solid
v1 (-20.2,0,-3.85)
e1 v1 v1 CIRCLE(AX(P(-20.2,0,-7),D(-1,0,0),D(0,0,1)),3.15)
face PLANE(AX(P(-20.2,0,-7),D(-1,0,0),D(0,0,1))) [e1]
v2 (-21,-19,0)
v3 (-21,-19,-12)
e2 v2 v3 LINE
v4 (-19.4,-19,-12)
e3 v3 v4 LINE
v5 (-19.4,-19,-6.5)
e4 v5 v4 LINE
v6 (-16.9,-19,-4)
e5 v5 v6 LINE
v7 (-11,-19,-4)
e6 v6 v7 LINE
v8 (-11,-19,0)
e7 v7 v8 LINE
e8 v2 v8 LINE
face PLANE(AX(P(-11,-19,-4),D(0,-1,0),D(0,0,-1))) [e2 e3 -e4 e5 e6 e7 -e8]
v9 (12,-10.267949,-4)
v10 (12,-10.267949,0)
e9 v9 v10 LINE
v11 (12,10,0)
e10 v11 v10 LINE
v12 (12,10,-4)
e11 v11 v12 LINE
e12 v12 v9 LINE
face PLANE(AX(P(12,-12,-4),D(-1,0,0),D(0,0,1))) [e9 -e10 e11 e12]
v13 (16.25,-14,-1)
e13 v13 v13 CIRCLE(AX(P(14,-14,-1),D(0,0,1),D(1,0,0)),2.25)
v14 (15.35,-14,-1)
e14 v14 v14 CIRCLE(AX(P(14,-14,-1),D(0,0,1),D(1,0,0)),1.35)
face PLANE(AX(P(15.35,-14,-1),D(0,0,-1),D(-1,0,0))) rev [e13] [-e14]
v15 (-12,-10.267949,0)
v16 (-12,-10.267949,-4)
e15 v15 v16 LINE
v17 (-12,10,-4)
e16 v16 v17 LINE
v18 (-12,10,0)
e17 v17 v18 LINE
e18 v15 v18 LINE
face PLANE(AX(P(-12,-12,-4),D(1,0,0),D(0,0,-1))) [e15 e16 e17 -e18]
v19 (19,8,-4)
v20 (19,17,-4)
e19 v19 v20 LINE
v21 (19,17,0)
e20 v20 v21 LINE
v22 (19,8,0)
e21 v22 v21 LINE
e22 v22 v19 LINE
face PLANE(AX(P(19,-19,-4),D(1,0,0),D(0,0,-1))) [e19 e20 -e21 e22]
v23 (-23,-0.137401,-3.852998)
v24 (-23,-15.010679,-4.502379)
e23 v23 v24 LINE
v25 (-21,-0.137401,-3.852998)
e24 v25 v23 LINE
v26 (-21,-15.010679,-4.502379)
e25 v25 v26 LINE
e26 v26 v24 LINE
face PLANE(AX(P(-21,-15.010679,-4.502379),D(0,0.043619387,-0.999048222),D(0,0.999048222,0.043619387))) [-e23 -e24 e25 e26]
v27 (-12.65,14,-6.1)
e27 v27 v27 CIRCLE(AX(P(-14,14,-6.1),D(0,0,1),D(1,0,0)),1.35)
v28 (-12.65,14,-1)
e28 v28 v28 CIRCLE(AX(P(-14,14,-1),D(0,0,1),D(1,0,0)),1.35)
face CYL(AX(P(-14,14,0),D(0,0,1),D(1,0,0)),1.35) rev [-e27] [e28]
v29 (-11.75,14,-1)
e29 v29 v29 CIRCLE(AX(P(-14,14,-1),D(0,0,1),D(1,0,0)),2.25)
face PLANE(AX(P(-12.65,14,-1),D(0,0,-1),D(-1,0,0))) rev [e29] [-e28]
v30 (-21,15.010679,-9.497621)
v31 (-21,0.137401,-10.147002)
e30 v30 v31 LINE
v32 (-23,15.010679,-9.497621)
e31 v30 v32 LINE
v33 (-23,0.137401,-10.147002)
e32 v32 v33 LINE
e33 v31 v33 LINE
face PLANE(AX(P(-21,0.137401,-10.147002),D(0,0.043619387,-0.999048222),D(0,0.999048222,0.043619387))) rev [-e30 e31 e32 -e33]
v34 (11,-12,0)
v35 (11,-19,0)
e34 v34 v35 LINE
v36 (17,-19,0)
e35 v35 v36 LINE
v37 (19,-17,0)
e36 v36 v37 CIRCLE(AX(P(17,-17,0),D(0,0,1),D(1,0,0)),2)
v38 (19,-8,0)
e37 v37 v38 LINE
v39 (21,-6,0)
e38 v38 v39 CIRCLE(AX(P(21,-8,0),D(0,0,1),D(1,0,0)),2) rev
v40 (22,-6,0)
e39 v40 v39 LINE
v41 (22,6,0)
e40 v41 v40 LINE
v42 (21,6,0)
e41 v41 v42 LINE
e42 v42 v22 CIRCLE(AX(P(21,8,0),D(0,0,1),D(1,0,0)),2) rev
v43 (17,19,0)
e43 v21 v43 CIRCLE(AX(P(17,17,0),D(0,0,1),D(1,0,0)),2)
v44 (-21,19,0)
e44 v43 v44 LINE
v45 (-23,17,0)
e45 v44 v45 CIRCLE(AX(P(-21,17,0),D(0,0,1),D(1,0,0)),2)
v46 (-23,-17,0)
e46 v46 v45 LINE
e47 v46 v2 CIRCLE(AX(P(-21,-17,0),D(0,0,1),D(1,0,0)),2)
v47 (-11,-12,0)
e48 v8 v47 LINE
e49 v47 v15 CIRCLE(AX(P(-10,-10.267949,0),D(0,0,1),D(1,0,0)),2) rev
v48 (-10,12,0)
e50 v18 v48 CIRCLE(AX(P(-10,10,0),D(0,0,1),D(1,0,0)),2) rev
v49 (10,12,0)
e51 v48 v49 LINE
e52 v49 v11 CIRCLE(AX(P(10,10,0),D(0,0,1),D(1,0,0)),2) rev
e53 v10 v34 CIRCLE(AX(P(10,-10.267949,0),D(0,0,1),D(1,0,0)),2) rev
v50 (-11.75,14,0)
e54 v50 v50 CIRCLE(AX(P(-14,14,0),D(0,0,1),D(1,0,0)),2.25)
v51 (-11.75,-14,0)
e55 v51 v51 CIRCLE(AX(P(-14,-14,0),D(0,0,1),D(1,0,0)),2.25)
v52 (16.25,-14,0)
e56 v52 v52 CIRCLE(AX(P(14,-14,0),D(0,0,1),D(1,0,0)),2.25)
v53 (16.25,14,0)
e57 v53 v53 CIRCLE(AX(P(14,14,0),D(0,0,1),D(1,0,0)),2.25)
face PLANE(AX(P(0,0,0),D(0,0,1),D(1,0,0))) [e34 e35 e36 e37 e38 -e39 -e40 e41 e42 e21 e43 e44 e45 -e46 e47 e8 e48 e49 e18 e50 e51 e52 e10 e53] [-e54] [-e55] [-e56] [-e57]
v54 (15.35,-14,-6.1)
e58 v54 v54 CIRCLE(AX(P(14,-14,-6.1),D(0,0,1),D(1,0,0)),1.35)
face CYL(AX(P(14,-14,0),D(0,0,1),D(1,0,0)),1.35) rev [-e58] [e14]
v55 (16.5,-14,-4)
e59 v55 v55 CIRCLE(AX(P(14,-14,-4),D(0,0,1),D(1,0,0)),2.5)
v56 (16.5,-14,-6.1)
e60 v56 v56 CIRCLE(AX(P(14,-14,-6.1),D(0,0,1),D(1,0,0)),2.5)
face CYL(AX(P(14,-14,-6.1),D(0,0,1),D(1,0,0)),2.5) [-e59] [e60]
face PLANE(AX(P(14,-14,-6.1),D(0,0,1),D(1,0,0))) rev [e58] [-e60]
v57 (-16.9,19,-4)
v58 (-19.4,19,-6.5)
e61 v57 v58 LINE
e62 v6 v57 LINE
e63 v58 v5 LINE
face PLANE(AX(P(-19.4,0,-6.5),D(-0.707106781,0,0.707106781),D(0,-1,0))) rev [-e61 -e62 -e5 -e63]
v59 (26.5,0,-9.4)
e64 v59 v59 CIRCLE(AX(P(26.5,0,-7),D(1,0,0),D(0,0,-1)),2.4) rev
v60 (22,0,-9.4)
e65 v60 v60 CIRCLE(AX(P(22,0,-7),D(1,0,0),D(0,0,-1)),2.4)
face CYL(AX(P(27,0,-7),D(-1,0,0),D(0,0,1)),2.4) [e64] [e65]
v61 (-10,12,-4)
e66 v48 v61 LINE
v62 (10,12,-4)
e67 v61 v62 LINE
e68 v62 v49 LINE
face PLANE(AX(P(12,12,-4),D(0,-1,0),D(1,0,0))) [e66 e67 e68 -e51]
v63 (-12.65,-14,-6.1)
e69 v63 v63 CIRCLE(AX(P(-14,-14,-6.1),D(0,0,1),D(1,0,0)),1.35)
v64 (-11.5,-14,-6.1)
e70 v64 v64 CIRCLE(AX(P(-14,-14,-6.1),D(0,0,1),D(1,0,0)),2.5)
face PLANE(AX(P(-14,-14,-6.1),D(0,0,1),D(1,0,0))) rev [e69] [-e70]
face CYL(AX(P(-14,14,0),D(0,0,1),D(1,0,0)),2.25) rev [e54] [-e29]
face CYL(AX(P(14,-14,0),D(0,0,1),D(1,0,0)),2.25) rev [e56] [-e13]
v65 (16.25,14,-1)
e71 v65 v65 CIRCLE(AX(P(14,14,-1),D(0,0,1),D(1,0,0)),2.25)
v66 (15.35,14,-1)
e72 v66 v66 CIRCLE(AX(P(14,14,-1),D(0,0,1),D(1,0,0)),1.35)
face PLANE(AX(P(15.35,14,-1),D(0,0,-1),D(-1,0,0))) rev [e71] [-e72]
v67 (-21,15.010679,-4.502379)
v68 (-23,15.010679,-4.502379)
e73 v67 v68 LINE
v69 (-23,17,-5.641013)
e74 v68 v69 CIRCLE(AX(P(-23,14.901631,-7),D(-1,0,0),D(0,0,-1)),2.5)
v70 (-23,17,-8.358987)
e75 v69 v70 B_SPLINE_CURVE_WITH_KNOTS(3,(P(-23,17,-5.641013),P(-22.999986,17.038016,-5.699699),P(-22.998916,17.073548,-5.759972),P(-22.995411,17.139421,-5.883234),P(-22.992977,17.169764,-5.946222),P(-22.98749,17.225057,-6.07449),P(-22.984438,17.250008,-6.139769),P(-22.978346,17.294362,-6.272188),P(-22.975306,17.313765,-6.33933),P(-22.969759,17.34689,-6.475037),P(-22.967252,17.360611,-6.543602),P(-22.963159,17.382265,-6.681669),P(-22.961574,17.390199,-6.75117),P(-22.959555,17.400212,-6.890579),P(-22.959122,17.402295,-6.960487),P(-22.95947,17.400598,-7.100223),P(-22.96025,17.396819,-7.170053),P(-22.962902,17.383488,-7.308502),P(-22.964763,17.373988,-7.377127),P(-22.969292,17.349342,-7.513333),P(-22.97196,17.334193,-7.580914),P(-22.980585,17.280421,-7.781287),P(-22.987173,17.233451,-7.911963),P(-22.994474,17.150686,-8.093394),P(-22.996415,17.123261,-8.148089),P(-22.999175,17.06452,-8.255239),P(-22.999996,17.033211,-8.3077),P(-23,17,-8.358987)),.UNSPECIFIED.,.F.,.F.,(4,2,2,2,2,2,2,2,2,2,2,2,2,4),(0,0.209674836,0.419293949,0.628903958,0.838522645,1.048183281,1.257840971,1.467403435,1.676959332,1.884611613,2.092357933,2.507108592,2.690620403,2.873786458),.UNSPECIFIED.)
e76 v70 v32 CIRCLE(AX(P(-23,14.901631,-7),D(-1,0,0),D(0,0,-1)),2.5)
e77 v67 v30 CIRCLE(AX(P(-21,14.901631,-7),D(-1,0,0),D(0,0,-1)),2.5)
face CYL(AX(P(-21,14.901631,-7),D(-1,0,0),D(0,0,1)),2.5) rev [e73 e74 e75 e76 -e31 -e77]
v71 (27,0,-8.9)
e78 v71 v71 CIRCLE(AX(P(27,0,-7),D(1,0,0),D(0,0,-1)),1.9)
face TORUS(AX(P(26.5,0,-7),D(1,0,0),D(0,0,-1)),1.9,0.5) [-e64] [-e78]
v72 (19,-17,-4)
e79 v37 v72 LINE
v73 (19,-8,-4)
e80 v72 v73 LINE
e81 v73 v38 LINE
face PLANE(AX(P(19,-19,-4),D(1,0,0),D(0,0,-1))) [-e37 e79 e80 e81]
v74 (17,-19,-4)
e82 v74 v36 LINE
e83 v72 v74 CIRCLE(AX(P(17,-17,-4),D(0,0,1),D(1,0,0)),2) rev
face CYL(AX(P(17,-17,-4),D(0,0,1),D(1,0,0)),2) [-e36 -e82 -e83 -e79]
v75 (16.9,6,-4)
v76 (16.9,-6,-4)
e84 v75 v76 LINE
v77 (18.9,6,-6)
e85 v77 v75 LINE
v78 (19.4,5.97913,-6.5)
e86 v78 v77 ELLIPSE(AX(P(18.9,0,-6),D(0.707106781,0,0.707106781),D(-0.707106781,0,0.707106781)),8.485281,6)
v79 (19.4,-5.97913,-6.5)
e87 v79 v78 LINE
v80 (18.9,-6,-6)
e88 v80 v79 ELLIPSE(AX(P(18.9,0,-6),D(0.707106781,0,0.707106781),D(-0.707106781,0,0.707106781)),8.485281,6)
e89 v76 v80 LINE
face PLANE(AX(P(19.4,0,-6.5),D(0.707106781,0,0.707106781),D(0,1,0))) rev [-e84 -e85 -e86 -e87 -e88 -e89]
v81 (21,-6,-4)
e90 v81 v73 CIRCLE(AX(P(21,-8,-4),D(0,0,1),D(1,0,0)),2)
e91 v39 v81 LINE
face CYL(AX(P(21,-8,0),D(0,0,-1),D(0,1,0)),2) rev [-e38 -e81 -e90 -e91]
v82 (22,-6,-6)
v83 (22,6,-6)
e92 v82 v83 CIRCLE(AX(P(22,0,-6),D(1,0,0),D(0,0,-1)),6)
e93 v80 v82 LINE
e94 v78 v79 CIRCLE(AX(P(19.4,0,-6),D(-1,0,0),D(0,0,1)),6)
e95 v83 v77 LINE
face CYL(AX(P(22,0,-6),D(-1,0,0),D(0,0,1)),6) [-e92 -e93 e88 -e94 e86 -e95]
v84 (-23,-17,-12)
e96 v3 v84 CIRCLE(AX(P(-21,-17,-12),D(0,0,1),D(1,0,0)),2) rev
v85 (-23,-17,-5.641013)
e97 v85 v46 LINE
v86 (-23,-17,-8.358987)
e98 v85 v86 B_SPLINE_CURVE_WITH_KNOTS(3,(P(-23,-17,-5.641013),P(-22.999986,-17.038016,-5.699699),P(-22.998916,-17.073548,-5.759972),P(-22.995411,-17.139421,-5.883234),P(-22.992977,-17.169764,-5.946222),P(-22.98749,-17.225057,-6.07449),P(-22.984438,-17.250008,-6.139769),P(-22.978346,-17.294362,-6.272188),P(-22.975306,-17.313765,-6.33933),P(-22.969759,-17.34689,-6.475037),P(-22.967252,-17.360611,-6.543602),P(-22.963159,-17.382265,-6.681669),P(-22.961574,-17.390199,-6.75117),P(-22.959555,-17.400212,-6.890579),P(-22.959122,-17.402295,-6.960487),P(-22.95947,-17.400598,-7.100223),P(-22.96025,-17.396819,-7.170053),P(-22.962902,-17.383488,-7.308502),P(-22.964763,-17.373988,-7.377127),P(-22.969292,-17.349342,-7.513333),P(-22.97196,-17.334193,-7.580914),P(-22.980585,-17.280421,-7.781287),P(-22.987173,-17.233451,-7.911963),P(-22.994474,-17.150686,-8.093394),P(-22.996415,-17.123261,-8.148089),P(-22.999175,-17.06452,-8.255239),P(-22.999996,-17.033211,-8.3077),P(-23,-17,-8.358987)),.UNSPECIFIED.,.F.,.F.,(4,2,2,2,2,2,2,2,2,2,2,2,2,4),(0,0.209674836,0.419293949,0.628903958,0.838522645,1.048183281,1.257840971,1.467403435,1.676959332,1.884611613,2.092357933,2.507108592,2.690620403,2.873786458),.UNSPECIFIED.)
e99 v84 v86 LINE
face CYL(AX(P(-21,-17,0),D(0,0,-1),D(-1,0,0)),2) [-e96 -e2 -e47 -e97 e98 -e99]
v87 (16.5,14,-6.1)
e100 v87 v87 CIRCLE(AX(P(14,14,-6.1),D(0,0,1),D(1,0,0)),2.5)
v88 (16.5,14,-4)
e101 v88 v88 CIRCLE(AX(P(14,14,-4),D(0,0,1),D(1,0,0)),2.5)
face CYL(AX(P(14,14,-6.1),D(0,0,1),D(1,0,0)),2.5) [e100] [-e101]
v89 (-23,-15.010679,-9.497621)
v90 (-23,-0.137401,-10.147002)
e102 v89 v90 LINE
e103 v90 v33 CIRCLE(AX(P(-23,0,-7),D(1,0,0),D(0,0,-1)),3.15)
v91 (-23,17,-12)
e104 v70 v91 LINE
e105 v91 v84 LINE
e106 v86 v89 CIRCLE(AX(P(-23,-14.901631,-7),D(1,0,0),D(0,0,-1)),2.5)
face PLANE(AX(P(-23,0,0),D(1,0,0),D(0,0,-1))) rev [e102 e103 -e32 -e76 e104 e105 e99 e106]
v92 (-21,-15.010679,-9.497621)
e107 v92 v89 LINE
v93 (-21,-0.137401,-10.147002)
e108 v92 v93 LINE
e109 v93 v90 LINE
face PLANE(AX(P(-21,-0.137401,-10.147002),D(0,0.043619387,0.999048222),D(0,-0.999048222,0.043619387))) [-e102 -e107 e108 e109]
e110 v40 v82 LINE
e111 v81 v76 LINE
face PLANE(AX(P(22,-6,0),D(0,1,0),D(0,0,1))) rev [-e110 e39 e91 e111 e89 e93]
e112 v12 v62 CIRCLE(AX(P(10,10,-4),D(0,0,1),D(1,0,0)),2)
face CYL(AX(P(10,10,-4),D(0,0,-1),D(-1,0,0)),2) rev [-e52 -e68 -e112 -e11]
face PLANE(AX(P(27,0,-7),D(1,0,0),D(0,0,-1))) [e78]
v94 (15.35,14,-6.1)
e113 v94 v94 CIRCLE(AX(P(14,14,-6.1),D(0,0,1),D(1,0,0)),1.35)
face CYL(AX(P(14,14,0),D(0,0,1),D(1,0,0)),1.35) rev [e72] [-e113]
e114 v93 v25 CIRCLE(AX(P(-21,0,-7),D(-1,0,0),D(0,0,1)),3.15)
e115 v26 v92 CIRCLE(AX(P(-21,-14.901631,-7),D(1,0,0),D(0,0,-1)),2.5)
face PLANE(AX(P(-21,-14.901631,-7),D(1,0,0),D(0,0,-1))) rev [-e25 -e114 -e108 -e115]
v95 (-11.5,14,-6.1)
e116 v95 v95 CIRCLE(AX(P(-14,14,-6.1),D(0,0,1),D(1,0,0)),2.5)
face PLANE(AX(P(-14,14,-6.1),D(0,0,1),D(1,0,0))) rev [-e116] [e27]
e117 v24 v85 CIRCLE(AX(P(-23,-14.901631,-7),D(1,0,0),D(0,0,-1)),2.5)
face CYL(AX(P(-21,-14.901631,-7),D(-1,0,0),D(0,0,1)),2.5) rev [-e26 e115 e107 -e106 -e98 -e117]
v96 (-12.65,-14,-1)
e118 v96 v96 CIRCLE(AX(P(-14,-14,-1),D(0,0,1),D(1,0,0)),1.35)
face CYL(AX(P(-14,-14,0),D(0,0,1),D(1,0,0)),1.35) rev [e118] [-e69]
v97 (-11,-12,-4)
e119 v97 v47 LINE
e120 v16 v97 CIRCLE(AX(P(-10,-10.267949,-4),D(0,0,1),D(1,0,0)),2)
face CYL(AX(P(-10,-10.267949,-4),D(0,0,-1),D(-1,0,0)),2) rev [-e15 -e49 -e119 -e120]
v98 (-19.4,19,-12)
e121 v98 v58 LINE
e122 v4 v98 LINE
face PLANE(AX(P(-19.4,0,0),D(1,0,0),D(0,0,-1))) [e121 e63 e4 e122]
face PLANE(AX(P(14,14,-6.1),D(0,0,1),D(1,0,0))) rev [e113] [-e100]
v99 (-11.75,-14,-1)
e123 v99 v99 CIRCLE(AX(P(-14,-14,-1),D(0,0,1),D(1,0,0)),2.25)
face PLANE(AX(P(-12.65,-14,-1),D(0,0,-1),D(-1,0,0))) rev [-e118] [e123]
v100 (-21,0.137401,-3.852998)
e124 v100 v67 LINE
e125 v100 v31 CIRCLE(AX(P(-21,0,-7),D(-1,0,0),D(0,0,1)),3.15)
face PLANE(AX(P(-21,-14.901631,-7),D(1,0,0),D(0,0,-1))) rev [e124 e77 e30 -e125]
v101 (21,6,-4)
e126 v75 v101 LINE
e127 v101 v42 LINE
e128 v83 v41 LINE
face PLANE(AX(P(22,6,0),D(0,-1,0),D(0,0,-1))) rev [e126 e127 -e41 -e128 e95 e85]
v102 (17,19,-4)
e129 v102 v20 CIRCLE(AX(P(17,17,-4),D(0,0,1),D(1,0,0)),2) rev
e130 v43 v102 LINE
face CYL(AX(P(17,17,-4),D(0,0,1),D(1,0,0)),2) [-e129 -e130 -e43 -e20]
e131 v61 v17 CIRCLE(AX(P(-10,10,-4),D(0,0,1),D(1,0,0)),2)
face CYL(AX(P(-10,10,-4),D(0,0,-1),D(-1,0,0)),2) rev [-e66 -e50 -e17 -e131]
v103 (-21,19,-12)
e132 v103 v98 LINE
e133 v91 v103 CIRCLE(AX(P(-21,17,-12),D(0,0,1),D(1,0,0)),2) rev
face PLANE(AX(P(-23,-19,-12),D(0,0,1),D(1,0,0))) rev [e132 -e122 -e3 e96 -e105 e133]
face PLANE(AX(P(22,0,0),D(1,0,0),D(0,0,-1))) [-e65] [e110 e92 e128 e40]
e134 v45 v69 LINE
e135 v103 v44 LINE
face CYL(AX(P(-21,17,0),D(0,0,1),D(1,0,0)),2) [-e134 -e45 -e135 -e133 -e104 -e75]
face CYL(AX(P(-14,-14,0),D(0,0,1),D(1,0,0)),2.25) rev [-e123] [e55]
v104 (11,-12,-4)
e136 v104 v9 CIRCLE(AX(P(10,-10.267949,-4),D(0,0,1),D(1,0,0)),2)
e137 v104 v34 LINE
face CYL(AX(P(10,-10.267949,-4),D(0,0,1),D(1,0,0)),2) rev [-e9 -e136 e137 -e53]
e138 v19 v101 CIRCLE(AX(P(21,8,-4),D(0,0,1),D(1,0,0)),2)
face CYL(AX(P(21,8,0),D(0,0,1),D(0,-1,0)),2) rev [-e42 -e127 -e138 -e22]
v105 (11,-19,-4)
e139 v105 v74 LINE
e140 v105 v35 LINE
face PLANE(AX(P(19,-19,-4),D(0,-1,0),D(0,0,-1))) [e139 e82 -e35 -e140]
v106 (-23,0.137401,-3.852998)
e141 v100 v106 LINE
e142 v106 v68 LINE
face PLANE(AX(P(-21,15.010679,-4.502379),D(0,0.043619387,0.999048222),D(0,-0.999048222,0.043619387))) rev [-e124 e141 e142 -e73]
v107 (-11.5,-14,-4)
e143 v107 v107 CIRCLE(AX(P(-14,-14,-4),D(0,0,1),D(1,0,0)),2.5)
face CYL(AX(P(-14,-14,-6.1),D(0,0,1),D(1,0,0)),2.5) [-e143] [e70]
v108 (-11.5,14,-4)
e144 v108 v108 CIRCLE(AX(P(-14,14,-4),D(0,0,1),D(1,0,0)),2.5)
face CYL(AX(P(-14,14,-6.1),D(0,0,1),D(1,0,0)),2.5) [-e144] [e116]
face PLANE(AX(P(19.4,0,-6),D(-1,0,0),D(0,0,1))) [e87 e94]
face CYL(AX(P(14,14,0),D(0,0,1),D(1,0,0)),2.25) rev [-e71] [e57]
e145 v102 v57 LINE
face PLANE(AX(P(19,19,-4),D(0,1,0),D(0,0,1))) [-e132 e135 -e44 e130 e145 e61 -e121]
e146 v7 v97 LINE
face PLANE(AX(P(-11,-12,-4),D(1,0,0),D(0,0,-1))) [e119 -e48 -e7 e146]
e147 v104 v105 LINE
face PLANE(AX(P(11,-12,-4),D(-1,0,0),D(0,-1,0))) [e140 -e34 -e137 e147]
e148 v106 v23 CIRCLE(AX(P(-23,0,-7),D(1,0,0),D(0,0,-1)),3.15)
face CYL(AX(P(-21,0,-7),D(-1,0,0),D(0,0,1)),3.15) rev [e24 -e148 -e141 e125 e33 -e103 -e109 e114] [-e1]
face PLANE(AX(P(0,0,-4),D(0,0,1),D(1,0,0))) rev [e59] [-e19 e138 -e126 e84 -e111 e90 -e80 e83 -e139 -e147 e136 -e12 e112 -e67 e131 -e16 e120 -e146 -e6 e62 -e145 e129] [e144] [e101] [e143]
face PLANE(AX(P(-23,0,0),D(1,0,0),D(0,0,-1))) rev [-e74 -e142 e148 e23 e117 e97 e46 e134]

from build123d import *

# Parameters (mm, degrees)
EXTRUDE_1_DEPTH           = 4
EXTRUDE_START             = -4
SKETCH_6_R                = 2.5000000000000004
SKETCH_6_R_2              = 2.4999999999999987
EXTRUDE_5_DEPTH           = 2.1
HOLE_WIZARD_1_D           = 2.7
HOLE_WIZARD_1_CBORE_D     = 4.5
HOLE_WIZARD_1_CBORE_DEPTH = 1
EXTRUDE_3_DEPTH           = 4
FILLET_1_R                = 2
CUT_EXTRUDE_1_DEPTH       = 2
SKETCH_14_R               = 3.150000000000003
CUT_EXTRUDE_4_DEPTH       = 0.8
EXTRUDE_6_DEPTH           = 3
SKETCH_11_R               = 2.399999999999999
EXTRUDE_7_DEPTH           = 5
FILLET_2_RADIUS           = 6
FILLET_2_LENGTH           = 3
FILLET_4_R                = 2
FILLET_6_R                = 0.5
CUT_EXTRUDE_2_DEPTH       = 0.4
CUT_EXTRUDE_3_DEPTH       = 0.4
CHAMFER_1_SIZE            = 2.5


with BuildPart() as part:
    # 草图1 → 凸台-拉伸1 (new body)
    with BuildSketch(Plane.XY):
        Polygon((19, -19), (11.999999999999977, -19), (11.000000000000004, -19), (11.000000000000002, -11.999999999999998), (11.999999999999977, -11.999999999999973), (11.999999999999977, 12.000000000000027), (-12.000000000000023, 12.000000000000023), (-12.000000000000023, -11.999999999999977), (-10.999999999999996, -12.000000000000002), (-10.999999999999996, -19), (-11.999999999999996, -19), (-19, -19), (-19, 19), (19, 19), align=None)
    extrude(amount=-EXTRUDE_1_DEPTH)

    # 草图6 → 凸台-拉伸5 (add)
    with BuildSketch(Plane.XY.offset(EXTRUDE_START)):
        with Locations((-14.000000000000115, 14.000000000000014)):
            Circle(SKETCH_6_R)
        with Locations((-14.000000000000112, -13.999999999999996)):
            Circle(SKETCH_6_R)
        with Locations((14.0000000000001, -13.99999999999998)):
            Circle(SKETCH_6_R_2)
        with Locations((14.000000000000096, 14.00000000000002)):
            Circle(SKETCH_6_R_2)
    extrude(amount=-EXTRUDE_5_DEPTH)

    # 孔1 (through all)
    with Locations(Plane.XY):
        with Locations((-14, 14), (14, -14), (14, 14), (-14, -14), (0, 0), (0.008296822, -0.048065229)):
            CounterBoreHole(HOLE_WIZARD_1_D / 2, HOLE_WIZARD_1_CBORE_D / 2, HOLE_WIZARD_1_CBORE_DEPTH)

    # 草图5 → 凸台-拉伸3 (add)
    with BuildSketch(Plane.ZY.offset(19)):
        Polygon((-12.000000000000004, -19.000000000000007), (-4.47e-15, -19.000000000000004), (-3.7e-16, 18.999999999999996), (-12.000000000000004, 18.999999999999993), align=None)
    extrude(amount=EXTRUDE_3_DEPTH)

    # 圆角1
    # the kernel refuses this fillet: 2 mm, written as the material it adds along each edge
    with BuildSketch(Plane(origin=(11.999999999999977, 12.000000000000027, 0), x_dir=(-1, 0, 0), z_dir=(0, 0, -1)), Plane(origin=(-12.000000000000023, 12.000000000000023, 0), x_dir=(0, -1, 0), z_dir=(0, 0, -1))) as fillet_1_piece_1:
        with BuildLine():
            CenterArc((FILLET_1_R, -FILLET_1_R), FILLET_1_R, 90, 90)
            Line((0, -FILLET_1_R), (0, 0))
            Line((0, 0), (FILLET_1_R, 0))
        make_face()
    extrude(amount=4)
    with BuildSketch(Plane(origin=(11.999999999999977, -11.999999999999973, 0), x_dir=(0, 1, 0), z_dir=(0, 0, -1))) as fillet_1_piece_2:
        with BuildLine():
            CenterArc((1.7320508075689318, -2), FILLET_1_R, 90, 60.00000000000051)
            Line((4.619e-14, -1.000000000000016), (0, 0))
            Line((0, 0), (1.7320508075689318, 0))
        make_face()
    extrude(amount=4)
    with BuildSketch(Plane(origin=(-12.000000000000023, -11.999999999999977, 0), x_dir=(1, 4.796e-14, 0), z_dir=(0, 0, -1))) as fillet_1_piece_3:
        with BuildLine():
            CenterArc((2.000000000000083, -1.7320508075688679), FILLET_1_R, 120.00000000000053, 60.00000000000222)
            Line((8.307e-14, -1.7320508075689638), (0, 0))
            Line((0, 0), (1.0000000000000675, 0))
        make_face()
    extrude(amount=4)
    # the kernel refuses this fillet: 2 mm, written as the material it takes off along each edge
    with BuildSketch(Plane(origin=(19, -19, 5), x_dir=(-1, 0, 0), z_dir=(0, 0, -1)), Plane(origin=(19, 19, 5), x_dir=(0, -1, 0), z_dir=(0, 0, -1))) as fillet_1_2_piece_1:
        with BuildLine():
            CenterArc((FILLET_1_R, FILLET_1_R), FILLET_1_R, 180, 90)
            Line((0, FILLET_1_R), (0, 0))
            Line((0, 0), (FILLET_1_R, 0))
        make_face()
    extrude(amount=14, mode=Mode.SUBTRACT)
    with BuildSketch(Plane(origin=(-23, -19.000000000000007, -17.000000000000004), x_dir=(1, 3.55e-15, 0), z_dir=(0, 3e-16, 1))) as fillet_1_2_piece_2:
        with BuildLine():
            CenterArc((FILLET_1_R, FILLET_1_R), FILLET_1_R, 180, 89.99999999999977)
            Line((7.11e-15, FILLET_1_R), (0, 0))
            Line((0, 0), (FILLET_1_R, 0))
        make_face()
    extrude(amount=22, mode=Mode.SUBTRACT)
    with BuildSketch(Plane(origin=(-23, 18.999999999999996, 5), x_dir=(1, 3.55e-15, 0), z_dir=(0, -3e-16, -1))) as fillet_1_2_piece_3:
        with BuildLine():
            CenterArc((FILLET_1_R, FILLET_1_R), FILLET_1_R, 180, 90.00000000000023)
            Line((-7.11e-15, FILLET_1_R), (0, 0))
            Line((0, 0), (FILLET_1_R, 0))
        make_face()
    extrude(amount=22.000000000000004, mode=Mode.SUBTRACT)

    # 草图9 → 切除-拉伸1 (cut)
    with BuildSketch(Plane(origin=(-23, 0, -24), x_dir=(0, 0, -1), z_dir=(1, 0, 0))):
        with BuildLine():
            Line((-19.497620553954647, -15.010679125349048), (-20.147001897982854, -0.1374010702007968))
            ThreePointArc((-20.147001897982854, -0.1374010702007968), (-16.999999999999996, 3.149999999999999), (-13.852998102017144, -0.13740107020079845))
            Line((-13.852998102017144, -0.13740107020079845), (-14.50237944604535, -15.01067912534905))
            ThreePointArc((-14.50237944604535, -15.01067912534905), (-16.999999999999993, -17.401630656935822), (-19.497620553954647, -15.010679125349048))
        make_face()
    cut_extrude_1 = extrude(amount=CUT_EXTRUDE_1_DEPTH, mode=Mode.SUBTRACT)

    # 镜向2: 切除-拉伸1 across plane
    add(cut_extrude_1.mirror(Plane.ZX), mode=Mode.SUBTRACT)

    # 草图14 → 切除-拉伸4 (cut)
    with BuildSketch(Plane.ZY.offset(20.999999999999996)):
        with Locations((-7.000000000000003, -6.1e-16)):
            Circle(SKETCH_14_R)
    extrude(amount=-CUT_EXTRUDE_4_DEPTH, mode=Mode.SUBTRACT)

    # 草图10 → 凸台-拉伸6 (add)
    with BuildSketch(Plane(origin=(19, 0, 0), x_dir=(0, 0, -1), z_dir=(1, 0, 0))):
        Polygon((1.59e-15, 6), (12.000000000000002, 6.000000000000002), (12.000000000000002, -6.000000000000002), (1.59e-15, -6), align=None)
    extrude(amount=EXTRUDE_6_DEPTH)

    # 草图11 → 凸台-拉伸7 (add)
    with BuildSketch(Plane(origin=(22, 0, 0), x_dir=(0, 0, -1), z_dir=(1, 0, 0))):
        with Locations((7.000000000000001, 0)):
            Circle(SKETCH_11_R)
    extrude(amount=EXTRUDE_7_DEPTH)

    # 圆角2: full round fillet: the end face becomes a half cylinder, R = half its width
    fillet_2_face = Plane((20.5, 0, -12), x_dir=(-1, 0, 0), z_dir=(0, 0, -1))  # on the end face: x along it, z out of the body
    fillet_2_slab = fillet_2_face.offset(-FILLET_2_RADIUS / 2) * Box(FILLET_2_LENGTH, 2 * FILLET_2_RADIUS, FILLET_2_RADIUS, mode=Mode.PRIVATE)  # the body's end, R deep
    fillet_2_round = Plane((20.5, 0, -6), x_dir=(0, 0, -1), z_dir=(-1, 0, 0)) * Cylinder(FILLET_2_RADIUS, FILLET_2_LENGTH, mode=Mode.PRIVATE)  # its axis R under the face
    add(fillet_2_slab - fillet_2_round, mode=Mode.SUBTRACT)

    # 圆角4
    fillet_4_edges = [part.edges().sort_by_distance(p)[0] for p in [
        (19, -6, -2.0000000000000018),
        (19, 6, -2.000000000000001),
    ]]
    fillet(fillet_4_edges, radius=FILLET_4_R)

    # 圆角6
    fillet_6_edges = [part.edges().sort_by_distance(p)[0] for p in [
        (27, 2.9e-16, -4.600000000000001),
    ]]
    fillet(fillet_6_edges, radius=FILLET_6_R)

    # 草图12 → 切除-拉伸2 (cut)
    with BuildSketch(Plane.ZY.offset(-19)):
        with BuildLine():
            Line((-4, 6.000000000000001), (-5.999999999999998, 6.000000000000001))
            ThreePointArc((-5.999999999999998, 6.000000000000001), (-12, 7.3e-16), (-6, -6.000000000000001))
            Line((-6, -6.000000000000001), (-4, -6.000000000000001))
            Line((-4, -6.000000000000001), (-4, 6.000000000000001))
        make_face()
    extrude(amount=-CUT_EXTRUDE_2_DEPTH, mode=Mode.SUBTRACT)

    # 草图13 → 切除-拉伸3 (cut)
    with BuildSketch(Plane(origin=(-19, 0, 0), x_dir=(0, 0, -1), z_dir=(1, 0, 0))):
        Polygon((12.000000000000004, -19.000000000000007), (12.000000000000004, 18.999999999999993), (4, 19), (4, -19.000000000000004), align=None)
    extrude(amount=-CUT_EXTRUDE_3_DEPTH, mode=Mode.SUBTRACT)

    # 倒角1
    chamfer_1_edges = [part.edges().sort_by_distance(p)[0] for p in [
        (-19.4, 0, -4),
        (19.4, 0, -4),
    ]]
    chamfer(chamfer_1_edges, length=CHAMFER_1_SIZE)


solid = part.part
